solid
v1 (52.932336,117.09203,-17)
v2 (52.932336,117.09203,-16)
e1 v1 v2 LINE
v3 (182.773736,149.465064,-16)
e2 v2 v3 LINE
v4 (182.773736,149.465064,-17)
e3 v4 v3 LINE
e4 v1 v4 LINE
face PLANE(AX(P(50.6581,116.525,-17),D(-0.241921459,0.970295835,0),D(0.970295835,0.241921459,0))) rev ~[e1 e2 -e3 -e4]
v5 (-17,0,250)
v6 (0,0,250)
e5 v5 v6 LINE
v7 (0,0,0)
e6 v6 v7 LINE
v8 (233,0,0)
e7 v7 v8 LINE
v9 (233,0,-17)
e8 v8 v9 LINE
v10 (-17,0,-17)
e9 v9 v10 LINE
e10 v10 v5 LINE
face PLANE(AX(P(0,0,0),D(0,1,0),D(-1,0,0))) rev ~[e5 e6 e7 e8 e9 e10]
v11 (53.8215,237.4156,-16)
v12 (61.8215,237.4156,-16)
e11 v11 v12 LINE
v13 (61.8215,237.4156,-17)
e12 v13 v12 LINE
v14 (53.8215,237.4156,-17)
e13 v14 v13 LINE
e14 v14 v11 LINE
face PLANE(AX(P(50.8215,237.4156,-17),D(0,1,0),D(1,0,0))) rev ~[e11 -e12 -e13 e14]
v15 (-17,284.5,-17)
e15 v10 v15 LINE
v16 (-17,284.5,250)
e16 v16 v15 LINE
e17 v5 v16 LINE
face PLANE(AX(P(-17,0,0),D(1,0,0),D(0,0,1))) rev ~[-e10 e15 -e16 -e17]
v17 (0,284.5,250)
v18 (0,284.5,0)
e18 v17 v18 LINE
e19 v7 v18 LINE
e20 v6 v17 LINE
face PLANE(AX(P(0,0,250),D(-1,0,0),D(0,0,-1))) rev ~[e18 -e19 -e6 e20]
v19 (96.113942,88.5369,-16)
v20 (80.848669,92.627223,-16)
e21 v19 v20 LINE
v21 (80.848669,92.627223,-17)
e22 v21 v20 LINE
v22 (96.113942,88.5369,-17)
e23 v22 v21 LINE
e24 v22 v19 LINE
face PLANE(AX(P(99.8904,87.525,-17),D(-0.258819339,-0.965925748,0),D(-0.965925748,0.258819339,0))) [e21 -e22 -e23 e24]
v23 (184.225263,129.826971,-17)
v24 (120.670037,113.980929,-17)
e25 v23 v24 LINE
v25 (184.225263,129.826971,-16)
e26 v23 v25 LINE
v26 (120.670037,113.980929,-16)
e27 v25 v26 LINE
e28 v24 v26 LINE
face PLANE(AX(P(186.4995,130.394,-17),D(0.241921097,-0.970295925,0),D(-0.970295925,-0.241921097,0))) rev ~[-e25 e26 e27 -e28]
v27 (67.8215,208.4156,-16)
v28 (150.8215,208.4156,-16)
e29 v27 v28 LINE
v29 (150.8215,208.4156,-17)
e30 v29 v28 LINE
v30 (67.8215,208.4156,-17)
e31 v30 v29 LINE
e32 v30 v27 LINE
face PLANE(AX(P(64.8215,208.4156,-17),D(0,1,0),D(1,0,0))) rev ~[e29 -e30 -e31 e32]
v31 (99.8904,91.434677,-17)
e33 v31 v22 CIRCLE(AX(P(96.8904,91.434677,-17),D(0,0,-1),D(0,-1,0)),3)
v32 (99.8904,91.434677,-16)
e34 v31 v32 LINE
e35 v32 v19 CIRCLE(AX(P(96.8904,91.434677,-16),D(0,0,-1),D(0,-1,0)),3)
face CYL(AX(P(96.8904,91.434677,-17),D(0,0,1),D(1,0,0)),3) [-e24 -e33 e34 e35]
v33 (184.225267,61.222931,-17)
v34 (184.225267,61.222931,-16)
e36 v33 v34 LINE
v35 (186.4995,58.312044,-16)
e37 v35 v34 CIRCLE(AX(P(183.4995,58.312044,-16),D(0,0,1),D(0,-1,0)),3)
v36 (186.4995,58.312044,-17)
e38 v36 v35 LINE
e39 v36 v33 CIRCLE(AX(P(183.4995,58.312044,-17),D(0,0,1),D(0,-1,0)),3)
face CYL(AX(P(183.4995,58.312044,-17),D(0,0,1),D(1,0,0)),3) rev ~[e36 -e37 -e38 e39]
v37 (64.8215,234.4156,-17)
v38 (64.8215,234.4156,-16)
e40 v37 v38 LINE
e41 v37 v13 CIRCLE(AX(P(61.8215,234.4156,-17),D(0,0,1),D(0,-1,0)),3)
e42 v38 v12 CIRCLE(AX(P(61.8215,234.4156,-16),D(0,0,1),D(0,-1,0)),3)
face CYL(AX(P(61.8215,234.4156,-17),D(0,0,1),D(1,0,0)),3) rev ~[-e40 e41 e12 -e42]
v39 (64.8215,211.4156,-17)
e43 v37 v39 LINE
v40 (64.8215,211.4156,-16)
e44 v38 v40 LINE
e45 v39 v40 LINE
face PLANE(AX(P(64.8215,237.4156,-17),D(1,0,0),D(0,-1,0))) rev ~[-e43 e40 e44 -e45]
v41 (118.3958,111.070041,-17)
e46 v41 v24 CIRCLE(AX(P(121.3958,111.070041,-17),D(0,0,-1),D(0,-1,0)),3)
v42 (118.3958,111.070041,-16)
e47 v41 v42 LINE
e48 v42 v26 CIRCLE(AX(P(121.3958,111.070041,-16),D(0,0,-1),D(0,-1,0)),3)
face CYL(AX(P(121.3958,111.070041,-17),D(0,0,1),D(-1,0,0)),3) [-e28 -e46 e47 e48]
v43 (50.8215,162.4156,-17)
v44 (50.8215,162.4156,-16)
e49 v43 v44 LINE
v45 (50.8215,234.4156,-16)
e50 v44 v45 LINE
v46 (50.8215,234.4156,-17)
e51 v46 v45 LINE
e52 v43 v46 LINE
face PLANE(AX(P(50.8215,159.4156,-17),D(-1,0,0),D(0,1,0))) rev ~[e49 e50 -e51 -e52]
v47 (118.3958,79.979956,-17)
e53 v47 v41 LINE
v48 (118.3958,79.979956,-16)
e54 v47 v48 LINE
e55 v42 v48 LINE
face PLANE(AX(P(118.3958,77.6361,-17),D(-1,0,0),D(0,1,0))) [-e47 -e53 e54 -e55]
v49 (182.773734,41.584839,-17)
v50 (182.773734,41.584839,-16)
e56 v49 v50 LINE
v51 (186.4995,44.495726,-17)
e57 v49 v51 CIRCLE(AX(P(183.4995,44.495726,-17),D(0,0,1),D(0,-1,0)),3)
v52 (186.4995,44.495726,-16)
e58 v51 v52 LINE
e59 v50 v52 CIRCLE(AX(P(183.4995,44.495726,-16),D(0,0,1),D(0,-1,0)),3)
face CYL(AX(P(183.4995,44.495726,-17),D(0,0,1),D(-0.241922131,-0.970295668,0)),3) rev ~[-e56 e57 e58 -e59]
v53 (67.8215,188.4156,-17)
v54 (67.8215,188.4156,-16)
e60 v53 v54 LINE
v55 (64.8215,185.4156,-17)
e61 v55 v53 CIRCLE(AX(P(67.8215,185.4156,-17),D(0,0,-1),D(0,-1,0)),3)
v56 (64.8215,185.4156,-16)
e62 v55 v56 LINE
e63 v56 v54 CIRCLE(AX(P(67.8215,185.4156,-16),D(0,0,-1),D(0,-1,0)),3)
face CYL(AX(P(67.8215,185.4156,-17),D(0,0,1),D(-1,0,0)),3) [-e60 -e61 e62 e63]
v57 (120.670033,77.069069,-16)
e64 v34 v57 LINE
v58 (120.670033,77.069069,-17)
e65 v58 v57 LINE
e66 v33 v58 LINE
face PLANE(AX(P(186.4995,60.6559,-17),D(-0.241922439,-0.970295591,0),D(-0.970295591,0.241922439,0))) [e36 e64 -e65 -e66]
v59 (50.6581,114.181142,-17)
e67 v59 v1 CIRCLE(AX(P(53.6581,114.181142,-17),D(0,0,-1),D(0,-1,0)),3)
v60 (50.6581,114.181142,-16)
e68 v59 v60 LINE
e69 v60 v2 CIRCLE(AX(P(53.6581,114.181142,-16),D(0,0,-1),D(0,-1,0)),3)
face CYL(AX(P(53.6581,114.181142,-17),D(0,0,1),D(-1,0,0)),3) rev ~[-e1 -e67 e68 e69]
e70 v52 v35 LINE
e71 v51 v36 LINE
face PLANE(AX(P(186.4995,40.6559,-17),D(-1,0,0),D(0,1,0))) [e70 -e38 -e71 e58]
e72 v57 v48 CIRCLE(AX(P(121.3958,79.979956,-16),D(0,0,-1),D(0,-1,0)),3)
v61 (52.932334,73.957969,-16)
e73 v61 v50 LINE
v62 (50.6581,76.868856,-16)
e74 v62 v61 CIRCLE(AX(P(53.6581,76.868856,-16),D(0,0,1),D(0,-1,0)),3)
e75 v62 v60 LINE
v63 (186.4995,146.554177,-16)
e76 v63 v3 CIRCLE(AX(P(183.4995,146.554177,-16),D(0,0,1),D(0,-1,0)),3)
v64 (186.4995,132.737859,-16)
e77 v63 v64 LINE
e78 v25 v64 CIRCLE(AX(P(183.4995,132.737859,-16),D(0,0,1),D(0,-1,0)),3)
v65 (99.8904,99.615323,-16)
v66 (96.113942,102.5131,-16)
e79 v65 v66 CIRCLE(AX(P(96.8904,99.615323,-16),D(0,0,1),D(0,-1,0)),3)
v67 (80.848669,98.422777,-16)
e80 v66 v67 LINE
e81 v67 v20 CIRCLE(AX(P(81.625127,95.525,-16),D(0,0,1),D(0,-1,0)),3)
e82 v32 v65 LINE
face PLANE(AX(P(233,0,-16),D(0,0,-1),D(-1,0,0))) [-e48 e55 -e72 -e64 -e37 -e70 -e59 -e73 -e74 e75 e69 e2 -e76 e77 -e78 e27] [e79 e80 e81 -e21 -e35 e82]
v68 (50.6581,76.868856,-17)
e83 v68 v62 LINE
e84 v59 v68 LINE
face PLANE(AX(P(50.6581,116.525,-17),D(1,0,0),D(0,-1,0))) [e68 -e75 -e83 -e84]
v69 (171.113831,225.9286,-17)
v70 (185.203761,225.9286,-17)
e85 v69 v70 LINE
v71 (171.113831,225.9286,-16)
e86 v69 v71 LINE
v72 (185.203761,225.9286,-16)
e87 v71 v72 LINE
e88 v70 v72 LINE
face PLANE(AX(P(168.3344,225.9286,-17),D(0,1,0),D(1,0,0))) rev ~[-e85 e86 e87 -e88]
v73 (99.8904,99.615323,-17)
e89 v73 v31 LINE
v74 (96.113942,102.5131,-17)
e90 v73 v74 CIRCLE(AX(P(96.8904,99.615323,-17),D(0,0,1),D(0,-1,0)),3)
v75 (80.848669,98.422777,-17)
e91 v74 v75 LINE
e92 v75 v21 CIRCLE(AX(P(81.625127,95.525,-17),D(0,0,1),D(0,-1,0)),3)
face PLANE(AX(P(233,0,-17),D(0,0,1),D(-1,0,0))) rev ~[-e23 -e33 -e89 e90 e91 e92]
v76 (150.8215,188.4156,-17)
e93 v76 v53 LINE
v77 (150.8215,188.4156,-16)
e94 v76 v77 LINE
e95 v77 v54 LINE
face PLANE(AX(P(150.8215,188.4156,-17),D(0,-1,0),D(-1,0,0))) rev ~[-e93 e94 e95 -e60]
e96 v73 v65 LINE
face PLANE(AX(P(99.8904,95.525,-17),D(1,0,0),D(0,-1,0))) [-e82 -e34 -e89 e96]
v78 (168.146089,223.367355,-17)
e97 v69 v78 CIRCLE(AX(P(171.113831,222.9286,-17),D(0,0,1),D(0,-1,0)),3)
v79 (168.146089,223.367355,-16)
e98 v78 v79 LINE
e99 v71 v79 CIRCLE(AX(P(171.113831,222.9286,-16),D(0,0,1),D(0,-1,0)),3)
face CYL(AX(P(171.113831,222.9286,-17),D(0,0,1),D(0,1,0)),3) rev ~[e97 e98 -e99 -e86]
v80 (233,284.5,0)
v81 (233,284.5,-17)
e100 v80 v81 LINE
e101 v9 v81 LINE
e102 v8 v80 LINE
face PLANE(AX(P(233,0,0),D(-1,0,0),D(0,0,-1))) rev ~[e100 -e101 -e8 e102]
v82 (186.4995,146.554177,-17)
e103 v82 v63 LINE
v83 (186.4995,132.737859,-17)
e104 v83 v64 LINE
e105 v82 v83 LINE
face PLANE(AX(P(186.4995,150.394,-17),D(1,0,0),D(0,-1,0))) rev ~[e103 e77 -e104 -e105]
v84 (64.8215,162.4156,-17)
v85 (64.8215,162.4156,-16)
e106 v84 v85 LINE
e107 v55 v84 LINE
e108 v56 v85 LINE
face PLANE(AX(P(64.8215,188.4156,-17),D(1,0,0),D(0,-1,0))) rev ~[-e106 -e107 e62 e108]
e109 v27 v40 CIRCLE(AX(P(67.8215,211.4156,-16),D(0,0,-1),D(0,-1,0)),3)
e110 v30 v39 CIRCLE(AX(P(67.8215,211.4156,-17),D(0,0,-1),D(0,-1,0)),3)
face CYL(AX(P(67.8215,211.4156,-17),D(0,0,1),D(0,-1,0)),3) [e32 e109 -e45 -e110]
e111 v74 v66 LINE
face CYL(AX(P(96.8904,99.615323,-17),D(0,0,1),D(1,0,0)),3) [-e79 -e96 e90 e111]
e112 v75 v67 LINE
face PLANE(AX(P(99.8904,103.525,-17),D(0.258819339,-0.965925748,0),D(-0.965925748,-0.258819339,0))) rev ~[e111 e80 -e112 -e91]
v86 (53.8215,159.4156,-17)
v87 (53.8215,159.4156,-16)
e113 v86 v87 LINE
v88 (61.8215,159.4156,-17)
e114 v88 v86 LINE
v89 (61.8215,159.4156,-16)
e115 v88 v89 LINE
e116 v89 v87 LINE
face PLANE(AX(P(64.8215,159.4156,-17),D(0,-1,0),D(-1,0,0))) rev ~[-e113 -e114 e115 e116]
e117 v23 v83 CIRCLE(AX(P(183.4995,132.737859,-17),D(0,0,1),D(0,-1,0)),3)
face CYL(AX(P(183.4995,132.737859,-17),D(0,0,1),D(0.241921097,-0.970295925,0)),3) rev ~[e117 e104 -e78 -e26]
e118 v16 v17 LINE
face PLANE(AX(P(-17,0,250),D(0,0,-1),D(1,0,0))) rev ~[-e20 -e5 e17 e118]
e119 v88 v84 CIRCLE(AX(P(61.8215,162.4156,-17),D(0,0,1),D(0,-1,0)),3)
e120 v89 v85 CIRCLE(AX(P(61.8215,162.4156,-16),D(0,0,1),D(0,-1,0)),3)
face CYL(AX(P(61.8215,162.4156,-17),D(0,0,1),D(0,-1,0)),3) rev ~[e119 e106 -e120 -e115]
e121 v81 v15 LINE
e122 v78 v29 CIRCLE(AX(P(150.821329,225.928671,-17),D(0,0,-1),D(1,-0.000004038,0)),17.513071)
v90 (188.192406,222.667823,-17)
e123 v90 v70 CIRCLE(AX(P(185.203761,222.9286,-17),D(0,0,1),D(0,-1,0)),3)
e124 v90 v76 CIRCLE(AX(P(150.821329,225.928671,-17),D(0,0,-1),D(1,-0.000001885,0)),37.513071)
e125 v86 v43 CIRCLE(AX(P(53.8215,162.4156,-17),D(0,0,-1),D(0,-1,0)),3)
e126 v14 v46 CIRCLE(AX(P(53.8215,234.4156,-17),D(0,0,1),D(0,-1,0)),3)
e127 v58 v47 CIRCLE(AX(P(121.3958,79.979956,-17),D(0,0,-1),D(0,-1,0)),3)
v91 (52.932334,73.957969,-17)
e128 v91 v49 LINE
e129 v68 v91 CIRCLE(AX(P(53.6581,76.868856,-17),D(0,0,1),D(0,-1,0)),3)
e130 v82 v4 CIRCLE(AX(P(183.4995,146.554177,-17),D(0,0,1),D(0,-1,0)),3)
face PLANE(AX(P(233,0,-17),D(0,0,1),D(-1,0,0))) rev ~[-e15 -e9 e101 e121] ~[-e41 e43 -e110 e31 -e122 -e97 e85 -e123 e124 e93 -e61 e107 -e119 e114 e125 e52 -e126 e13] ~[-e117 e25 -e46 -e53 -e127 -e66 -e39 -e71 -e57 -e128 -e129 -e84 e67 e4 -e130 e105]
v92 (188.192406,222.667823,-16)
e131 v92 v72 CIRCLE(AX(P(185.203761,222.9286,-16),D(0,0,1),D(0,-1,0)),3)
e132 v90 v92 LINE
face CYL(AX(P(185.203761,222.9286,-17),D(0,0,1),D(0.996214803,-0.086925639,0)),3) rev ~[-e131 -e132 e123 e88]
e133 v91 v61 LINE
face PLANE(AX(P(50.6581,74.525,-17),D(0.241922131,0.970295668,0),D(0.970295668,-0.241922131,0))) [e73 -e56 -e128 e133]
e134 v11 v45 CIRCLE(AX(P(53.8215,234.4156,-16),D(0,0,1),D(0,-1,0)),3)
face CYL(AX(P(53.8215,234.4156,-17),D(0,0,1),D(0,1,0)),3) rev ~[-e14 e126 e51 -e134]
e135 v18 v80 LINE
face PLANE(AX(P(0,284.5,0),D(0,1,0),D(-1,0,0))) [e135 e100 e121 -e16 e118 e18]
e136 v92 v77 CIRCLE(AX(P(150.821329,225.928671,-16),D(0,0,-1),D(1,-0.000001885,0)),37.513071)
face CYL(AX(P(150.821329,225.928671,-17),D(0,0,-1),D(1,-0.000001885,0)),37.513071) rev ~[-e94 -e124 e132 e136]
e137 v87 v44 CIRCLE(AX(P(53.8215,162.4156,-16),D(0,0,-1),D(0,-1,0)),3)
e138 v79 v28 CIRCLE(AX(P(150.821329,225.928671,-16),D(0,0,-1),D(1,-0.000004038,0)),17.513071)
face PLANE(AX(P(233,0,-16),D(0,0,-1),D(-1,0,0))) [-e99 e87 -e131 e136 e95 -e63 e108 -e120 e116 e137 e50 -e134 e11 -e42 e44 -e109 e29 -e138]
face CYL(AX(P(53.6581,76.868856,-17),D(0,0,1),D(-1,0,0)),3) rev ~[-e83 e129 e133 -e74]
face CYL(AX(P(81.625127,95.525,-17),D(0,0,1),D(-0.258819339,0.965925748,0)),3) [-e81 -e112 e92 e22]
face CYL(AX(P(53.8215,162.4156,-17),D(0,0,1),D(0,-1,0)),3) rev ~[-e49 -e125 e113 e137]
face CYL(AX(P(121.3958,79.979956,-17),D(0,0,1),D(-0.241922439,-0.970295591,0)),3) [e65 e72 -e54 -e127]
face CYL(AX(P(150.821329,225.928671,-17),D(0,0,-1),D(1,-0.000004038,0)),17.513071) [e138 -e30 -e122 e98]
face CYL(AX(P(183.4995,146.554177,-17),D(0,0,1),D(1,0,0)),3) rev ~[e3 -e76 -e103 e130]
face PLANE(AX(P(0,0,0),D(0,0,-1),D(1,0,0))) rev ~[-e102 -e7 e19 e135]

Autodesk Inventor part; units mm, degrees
ref_plane "YZ Plane" through (0, 0, 0) normal (1, 0, 0) x (0, 1, 0)
ref_plane "XZ Plane" through (0, 0, 0) normal (0, 1, 0) x (-1, 0, 0)
ref_plane "XY Plane" through (0, 0, 0) normal (0, 0, 1) x (1, 0, 0)
sketch "Sketch1" plane through (0, 0, 0) normal (0, 1, 0) x (-1, 0, 0)
  line L0 (17, 250) -> (0, 250)
  line L1 (0, 250) -> (0, 0)
  line L2 (0, 0) -> (17, 0)
  line L3 (17, 0) -> (17, 250)
  line L4 (17, 0) -> (-233, 0)
  line L5 (-233, 0) -> (-233, -17)
  line L6 (-233, -17) -> (17, -17)
  line L7 (17, -17) -> (17, 0)
  dimension "d0" = 17
  dimension "d1" = 250
  dimension "d2" = 250
extrude "Extrusion1" add sketch "Sketch1" along normal blind 284.5
sketch "Sketch2" plane through (233, 0, -17) normal (0, 0, -1) x (-1, 0, 0)
  line L0 (0, 0) -> (250, 0) projected
  line L1 (250, 0) -> (250, 284.5) projected
  line L2 (0, 284.5) -> (250, 284.5) projected
  line L3 (0, 0) -> (0, 284.5) projected
  line L4 (182.1785, 237.4156) -> (168.1785, 237.4156)
  line L5 (168.1785, 237.4156) -> (168.1785, 159.4156)
  line L6 (168.1785, 159.4156) -> (182.1785, 159.4156)
  line L7 (182.1785, 159.4156) -> (182.1785, 237.4156)
  line L8 (168.1785, 208.4156) -> (82.1785, 208.4156)
  line L9 (82.1785, 208.4156) -> (82.1785, 188.4156)
  line L10 (82.1785, 188.4156) -> (168.1785, 188.4156)
  line L11 (168.1785, 188.4156) -> (168.1785, 208.4156)
  arc A0 (64.6656, 225.9286) -> (82.1785, 208.4156) centre (82.1785, 225.9286) ccw
  line L12 (82.1785, 225.9286) -> (64.6656, 225.9286) construction
  line L13 (82.1785, 225.9286) -> (82.1785, 208.4156) construction
  arc A1 (44.6656, 225.9286) -> (82.1785, 188.4156) centre (82.1785, 225.9286) ccw
  line L14 (64.6656, 225.9286) -> (44.6656, 225.9286)
  line L15 (182.3419, 116.525) -> (46.5005, 150.394)
  line L16 (46.5005, 150.394) -> (46.5005, 130.394)
  line L17 (46.5005, 130.394) -> (114.6042, 113.4139)
  line L18 (133.1096, 95.525) -> (133.1096, 103.525)
  line L19 (133.1096, 103.525) -> (163.0533, 95.5016)
  line L20 (114.6042, 113.4139) -> (114.6042, 93.4139)
  line L21 (182.3419, 116.525) -> (182.3419, 95.525)
  line L22 (133.1096, 95.525) -> (42.0362, 95.525)
  line L23 (182.3419, 74.525) -> (46.5005, 40.6559)
  line L24 (46.5005, 40.6559) -> (46.5005, 60.6559)
  line L25 (46.5005, 60.6559) -> (114.6042, 77.6361)
  line L26 (133.1096, 95.525) -> (133.1096, 87.525)
  line L27 (133.1096, 87.525) -> (163.0533, 95.5484)
  line L28 (114.6042, 77.6361) -> (114.6042, 97.6361)
  line L29 (182.3419, 74.525) -> (182.3419, 95.525)
  point P0 (233, 0)
  point P1 (162.966, 95.525)
  dimension "d5" = 90
  dimension "d6" = 21
  dimension "d7" = 140
  dimension "d8" = 20
  dimension "d9" = 20
  dimension "d10" = 8
  dimension "d11" = 31
  dimension "d12" = 68.1037
  dimension "d13" = 78
  dimension "d14" = 20
  dimension "d15" = 29
  dimension "d16" = 14
  dimension "d18" = 86
  dimension "d19" = 75
  dimension "d20" = 76
extrude "Extrusion2" cut sketch "Sketch2" against normal blind 1 contours L7 L6 L5 L4 | L5 L10 L9 L8 | L9 A1 L14 A0 | L21 L29 L23 L24 L25 L28 L20 L17 L16 L15
fillet "Fillet1" radius 3 19 edges at (50.6581, 116.525, -16.5) (99.8904, 87.525, -16.5) (99.8904, 103.525, -16.5) (70.034, 95.525, -16.5) (50.6581, 74.525, -16.5) (50.8215, 159.4156, -16.5) (64.8215, 188.4156, -16.5) (118.3958, 113.4139, -16.5) (118.3958, 77.6361, -16.5) (186.4995, 40.6559, -16.5) (186.4995, 60.6559, -16.5) (186.4995, 130.394, -16.5) (186.4995, 150.394, -16.5) (168.3344, 225.9286, -16.5) (188.3344, 225.9286, -16.5) (64.8215, 237.4156, -16.5) (50.8215, 237.4156, -16.5) (64.8215, 159.4156, -16.5) (64.8215, 208.4156, -16.5)
equation "\"d15\" = 0.5 * d13 - 0.5 * d14"
properties part number "TableroEscrito"
